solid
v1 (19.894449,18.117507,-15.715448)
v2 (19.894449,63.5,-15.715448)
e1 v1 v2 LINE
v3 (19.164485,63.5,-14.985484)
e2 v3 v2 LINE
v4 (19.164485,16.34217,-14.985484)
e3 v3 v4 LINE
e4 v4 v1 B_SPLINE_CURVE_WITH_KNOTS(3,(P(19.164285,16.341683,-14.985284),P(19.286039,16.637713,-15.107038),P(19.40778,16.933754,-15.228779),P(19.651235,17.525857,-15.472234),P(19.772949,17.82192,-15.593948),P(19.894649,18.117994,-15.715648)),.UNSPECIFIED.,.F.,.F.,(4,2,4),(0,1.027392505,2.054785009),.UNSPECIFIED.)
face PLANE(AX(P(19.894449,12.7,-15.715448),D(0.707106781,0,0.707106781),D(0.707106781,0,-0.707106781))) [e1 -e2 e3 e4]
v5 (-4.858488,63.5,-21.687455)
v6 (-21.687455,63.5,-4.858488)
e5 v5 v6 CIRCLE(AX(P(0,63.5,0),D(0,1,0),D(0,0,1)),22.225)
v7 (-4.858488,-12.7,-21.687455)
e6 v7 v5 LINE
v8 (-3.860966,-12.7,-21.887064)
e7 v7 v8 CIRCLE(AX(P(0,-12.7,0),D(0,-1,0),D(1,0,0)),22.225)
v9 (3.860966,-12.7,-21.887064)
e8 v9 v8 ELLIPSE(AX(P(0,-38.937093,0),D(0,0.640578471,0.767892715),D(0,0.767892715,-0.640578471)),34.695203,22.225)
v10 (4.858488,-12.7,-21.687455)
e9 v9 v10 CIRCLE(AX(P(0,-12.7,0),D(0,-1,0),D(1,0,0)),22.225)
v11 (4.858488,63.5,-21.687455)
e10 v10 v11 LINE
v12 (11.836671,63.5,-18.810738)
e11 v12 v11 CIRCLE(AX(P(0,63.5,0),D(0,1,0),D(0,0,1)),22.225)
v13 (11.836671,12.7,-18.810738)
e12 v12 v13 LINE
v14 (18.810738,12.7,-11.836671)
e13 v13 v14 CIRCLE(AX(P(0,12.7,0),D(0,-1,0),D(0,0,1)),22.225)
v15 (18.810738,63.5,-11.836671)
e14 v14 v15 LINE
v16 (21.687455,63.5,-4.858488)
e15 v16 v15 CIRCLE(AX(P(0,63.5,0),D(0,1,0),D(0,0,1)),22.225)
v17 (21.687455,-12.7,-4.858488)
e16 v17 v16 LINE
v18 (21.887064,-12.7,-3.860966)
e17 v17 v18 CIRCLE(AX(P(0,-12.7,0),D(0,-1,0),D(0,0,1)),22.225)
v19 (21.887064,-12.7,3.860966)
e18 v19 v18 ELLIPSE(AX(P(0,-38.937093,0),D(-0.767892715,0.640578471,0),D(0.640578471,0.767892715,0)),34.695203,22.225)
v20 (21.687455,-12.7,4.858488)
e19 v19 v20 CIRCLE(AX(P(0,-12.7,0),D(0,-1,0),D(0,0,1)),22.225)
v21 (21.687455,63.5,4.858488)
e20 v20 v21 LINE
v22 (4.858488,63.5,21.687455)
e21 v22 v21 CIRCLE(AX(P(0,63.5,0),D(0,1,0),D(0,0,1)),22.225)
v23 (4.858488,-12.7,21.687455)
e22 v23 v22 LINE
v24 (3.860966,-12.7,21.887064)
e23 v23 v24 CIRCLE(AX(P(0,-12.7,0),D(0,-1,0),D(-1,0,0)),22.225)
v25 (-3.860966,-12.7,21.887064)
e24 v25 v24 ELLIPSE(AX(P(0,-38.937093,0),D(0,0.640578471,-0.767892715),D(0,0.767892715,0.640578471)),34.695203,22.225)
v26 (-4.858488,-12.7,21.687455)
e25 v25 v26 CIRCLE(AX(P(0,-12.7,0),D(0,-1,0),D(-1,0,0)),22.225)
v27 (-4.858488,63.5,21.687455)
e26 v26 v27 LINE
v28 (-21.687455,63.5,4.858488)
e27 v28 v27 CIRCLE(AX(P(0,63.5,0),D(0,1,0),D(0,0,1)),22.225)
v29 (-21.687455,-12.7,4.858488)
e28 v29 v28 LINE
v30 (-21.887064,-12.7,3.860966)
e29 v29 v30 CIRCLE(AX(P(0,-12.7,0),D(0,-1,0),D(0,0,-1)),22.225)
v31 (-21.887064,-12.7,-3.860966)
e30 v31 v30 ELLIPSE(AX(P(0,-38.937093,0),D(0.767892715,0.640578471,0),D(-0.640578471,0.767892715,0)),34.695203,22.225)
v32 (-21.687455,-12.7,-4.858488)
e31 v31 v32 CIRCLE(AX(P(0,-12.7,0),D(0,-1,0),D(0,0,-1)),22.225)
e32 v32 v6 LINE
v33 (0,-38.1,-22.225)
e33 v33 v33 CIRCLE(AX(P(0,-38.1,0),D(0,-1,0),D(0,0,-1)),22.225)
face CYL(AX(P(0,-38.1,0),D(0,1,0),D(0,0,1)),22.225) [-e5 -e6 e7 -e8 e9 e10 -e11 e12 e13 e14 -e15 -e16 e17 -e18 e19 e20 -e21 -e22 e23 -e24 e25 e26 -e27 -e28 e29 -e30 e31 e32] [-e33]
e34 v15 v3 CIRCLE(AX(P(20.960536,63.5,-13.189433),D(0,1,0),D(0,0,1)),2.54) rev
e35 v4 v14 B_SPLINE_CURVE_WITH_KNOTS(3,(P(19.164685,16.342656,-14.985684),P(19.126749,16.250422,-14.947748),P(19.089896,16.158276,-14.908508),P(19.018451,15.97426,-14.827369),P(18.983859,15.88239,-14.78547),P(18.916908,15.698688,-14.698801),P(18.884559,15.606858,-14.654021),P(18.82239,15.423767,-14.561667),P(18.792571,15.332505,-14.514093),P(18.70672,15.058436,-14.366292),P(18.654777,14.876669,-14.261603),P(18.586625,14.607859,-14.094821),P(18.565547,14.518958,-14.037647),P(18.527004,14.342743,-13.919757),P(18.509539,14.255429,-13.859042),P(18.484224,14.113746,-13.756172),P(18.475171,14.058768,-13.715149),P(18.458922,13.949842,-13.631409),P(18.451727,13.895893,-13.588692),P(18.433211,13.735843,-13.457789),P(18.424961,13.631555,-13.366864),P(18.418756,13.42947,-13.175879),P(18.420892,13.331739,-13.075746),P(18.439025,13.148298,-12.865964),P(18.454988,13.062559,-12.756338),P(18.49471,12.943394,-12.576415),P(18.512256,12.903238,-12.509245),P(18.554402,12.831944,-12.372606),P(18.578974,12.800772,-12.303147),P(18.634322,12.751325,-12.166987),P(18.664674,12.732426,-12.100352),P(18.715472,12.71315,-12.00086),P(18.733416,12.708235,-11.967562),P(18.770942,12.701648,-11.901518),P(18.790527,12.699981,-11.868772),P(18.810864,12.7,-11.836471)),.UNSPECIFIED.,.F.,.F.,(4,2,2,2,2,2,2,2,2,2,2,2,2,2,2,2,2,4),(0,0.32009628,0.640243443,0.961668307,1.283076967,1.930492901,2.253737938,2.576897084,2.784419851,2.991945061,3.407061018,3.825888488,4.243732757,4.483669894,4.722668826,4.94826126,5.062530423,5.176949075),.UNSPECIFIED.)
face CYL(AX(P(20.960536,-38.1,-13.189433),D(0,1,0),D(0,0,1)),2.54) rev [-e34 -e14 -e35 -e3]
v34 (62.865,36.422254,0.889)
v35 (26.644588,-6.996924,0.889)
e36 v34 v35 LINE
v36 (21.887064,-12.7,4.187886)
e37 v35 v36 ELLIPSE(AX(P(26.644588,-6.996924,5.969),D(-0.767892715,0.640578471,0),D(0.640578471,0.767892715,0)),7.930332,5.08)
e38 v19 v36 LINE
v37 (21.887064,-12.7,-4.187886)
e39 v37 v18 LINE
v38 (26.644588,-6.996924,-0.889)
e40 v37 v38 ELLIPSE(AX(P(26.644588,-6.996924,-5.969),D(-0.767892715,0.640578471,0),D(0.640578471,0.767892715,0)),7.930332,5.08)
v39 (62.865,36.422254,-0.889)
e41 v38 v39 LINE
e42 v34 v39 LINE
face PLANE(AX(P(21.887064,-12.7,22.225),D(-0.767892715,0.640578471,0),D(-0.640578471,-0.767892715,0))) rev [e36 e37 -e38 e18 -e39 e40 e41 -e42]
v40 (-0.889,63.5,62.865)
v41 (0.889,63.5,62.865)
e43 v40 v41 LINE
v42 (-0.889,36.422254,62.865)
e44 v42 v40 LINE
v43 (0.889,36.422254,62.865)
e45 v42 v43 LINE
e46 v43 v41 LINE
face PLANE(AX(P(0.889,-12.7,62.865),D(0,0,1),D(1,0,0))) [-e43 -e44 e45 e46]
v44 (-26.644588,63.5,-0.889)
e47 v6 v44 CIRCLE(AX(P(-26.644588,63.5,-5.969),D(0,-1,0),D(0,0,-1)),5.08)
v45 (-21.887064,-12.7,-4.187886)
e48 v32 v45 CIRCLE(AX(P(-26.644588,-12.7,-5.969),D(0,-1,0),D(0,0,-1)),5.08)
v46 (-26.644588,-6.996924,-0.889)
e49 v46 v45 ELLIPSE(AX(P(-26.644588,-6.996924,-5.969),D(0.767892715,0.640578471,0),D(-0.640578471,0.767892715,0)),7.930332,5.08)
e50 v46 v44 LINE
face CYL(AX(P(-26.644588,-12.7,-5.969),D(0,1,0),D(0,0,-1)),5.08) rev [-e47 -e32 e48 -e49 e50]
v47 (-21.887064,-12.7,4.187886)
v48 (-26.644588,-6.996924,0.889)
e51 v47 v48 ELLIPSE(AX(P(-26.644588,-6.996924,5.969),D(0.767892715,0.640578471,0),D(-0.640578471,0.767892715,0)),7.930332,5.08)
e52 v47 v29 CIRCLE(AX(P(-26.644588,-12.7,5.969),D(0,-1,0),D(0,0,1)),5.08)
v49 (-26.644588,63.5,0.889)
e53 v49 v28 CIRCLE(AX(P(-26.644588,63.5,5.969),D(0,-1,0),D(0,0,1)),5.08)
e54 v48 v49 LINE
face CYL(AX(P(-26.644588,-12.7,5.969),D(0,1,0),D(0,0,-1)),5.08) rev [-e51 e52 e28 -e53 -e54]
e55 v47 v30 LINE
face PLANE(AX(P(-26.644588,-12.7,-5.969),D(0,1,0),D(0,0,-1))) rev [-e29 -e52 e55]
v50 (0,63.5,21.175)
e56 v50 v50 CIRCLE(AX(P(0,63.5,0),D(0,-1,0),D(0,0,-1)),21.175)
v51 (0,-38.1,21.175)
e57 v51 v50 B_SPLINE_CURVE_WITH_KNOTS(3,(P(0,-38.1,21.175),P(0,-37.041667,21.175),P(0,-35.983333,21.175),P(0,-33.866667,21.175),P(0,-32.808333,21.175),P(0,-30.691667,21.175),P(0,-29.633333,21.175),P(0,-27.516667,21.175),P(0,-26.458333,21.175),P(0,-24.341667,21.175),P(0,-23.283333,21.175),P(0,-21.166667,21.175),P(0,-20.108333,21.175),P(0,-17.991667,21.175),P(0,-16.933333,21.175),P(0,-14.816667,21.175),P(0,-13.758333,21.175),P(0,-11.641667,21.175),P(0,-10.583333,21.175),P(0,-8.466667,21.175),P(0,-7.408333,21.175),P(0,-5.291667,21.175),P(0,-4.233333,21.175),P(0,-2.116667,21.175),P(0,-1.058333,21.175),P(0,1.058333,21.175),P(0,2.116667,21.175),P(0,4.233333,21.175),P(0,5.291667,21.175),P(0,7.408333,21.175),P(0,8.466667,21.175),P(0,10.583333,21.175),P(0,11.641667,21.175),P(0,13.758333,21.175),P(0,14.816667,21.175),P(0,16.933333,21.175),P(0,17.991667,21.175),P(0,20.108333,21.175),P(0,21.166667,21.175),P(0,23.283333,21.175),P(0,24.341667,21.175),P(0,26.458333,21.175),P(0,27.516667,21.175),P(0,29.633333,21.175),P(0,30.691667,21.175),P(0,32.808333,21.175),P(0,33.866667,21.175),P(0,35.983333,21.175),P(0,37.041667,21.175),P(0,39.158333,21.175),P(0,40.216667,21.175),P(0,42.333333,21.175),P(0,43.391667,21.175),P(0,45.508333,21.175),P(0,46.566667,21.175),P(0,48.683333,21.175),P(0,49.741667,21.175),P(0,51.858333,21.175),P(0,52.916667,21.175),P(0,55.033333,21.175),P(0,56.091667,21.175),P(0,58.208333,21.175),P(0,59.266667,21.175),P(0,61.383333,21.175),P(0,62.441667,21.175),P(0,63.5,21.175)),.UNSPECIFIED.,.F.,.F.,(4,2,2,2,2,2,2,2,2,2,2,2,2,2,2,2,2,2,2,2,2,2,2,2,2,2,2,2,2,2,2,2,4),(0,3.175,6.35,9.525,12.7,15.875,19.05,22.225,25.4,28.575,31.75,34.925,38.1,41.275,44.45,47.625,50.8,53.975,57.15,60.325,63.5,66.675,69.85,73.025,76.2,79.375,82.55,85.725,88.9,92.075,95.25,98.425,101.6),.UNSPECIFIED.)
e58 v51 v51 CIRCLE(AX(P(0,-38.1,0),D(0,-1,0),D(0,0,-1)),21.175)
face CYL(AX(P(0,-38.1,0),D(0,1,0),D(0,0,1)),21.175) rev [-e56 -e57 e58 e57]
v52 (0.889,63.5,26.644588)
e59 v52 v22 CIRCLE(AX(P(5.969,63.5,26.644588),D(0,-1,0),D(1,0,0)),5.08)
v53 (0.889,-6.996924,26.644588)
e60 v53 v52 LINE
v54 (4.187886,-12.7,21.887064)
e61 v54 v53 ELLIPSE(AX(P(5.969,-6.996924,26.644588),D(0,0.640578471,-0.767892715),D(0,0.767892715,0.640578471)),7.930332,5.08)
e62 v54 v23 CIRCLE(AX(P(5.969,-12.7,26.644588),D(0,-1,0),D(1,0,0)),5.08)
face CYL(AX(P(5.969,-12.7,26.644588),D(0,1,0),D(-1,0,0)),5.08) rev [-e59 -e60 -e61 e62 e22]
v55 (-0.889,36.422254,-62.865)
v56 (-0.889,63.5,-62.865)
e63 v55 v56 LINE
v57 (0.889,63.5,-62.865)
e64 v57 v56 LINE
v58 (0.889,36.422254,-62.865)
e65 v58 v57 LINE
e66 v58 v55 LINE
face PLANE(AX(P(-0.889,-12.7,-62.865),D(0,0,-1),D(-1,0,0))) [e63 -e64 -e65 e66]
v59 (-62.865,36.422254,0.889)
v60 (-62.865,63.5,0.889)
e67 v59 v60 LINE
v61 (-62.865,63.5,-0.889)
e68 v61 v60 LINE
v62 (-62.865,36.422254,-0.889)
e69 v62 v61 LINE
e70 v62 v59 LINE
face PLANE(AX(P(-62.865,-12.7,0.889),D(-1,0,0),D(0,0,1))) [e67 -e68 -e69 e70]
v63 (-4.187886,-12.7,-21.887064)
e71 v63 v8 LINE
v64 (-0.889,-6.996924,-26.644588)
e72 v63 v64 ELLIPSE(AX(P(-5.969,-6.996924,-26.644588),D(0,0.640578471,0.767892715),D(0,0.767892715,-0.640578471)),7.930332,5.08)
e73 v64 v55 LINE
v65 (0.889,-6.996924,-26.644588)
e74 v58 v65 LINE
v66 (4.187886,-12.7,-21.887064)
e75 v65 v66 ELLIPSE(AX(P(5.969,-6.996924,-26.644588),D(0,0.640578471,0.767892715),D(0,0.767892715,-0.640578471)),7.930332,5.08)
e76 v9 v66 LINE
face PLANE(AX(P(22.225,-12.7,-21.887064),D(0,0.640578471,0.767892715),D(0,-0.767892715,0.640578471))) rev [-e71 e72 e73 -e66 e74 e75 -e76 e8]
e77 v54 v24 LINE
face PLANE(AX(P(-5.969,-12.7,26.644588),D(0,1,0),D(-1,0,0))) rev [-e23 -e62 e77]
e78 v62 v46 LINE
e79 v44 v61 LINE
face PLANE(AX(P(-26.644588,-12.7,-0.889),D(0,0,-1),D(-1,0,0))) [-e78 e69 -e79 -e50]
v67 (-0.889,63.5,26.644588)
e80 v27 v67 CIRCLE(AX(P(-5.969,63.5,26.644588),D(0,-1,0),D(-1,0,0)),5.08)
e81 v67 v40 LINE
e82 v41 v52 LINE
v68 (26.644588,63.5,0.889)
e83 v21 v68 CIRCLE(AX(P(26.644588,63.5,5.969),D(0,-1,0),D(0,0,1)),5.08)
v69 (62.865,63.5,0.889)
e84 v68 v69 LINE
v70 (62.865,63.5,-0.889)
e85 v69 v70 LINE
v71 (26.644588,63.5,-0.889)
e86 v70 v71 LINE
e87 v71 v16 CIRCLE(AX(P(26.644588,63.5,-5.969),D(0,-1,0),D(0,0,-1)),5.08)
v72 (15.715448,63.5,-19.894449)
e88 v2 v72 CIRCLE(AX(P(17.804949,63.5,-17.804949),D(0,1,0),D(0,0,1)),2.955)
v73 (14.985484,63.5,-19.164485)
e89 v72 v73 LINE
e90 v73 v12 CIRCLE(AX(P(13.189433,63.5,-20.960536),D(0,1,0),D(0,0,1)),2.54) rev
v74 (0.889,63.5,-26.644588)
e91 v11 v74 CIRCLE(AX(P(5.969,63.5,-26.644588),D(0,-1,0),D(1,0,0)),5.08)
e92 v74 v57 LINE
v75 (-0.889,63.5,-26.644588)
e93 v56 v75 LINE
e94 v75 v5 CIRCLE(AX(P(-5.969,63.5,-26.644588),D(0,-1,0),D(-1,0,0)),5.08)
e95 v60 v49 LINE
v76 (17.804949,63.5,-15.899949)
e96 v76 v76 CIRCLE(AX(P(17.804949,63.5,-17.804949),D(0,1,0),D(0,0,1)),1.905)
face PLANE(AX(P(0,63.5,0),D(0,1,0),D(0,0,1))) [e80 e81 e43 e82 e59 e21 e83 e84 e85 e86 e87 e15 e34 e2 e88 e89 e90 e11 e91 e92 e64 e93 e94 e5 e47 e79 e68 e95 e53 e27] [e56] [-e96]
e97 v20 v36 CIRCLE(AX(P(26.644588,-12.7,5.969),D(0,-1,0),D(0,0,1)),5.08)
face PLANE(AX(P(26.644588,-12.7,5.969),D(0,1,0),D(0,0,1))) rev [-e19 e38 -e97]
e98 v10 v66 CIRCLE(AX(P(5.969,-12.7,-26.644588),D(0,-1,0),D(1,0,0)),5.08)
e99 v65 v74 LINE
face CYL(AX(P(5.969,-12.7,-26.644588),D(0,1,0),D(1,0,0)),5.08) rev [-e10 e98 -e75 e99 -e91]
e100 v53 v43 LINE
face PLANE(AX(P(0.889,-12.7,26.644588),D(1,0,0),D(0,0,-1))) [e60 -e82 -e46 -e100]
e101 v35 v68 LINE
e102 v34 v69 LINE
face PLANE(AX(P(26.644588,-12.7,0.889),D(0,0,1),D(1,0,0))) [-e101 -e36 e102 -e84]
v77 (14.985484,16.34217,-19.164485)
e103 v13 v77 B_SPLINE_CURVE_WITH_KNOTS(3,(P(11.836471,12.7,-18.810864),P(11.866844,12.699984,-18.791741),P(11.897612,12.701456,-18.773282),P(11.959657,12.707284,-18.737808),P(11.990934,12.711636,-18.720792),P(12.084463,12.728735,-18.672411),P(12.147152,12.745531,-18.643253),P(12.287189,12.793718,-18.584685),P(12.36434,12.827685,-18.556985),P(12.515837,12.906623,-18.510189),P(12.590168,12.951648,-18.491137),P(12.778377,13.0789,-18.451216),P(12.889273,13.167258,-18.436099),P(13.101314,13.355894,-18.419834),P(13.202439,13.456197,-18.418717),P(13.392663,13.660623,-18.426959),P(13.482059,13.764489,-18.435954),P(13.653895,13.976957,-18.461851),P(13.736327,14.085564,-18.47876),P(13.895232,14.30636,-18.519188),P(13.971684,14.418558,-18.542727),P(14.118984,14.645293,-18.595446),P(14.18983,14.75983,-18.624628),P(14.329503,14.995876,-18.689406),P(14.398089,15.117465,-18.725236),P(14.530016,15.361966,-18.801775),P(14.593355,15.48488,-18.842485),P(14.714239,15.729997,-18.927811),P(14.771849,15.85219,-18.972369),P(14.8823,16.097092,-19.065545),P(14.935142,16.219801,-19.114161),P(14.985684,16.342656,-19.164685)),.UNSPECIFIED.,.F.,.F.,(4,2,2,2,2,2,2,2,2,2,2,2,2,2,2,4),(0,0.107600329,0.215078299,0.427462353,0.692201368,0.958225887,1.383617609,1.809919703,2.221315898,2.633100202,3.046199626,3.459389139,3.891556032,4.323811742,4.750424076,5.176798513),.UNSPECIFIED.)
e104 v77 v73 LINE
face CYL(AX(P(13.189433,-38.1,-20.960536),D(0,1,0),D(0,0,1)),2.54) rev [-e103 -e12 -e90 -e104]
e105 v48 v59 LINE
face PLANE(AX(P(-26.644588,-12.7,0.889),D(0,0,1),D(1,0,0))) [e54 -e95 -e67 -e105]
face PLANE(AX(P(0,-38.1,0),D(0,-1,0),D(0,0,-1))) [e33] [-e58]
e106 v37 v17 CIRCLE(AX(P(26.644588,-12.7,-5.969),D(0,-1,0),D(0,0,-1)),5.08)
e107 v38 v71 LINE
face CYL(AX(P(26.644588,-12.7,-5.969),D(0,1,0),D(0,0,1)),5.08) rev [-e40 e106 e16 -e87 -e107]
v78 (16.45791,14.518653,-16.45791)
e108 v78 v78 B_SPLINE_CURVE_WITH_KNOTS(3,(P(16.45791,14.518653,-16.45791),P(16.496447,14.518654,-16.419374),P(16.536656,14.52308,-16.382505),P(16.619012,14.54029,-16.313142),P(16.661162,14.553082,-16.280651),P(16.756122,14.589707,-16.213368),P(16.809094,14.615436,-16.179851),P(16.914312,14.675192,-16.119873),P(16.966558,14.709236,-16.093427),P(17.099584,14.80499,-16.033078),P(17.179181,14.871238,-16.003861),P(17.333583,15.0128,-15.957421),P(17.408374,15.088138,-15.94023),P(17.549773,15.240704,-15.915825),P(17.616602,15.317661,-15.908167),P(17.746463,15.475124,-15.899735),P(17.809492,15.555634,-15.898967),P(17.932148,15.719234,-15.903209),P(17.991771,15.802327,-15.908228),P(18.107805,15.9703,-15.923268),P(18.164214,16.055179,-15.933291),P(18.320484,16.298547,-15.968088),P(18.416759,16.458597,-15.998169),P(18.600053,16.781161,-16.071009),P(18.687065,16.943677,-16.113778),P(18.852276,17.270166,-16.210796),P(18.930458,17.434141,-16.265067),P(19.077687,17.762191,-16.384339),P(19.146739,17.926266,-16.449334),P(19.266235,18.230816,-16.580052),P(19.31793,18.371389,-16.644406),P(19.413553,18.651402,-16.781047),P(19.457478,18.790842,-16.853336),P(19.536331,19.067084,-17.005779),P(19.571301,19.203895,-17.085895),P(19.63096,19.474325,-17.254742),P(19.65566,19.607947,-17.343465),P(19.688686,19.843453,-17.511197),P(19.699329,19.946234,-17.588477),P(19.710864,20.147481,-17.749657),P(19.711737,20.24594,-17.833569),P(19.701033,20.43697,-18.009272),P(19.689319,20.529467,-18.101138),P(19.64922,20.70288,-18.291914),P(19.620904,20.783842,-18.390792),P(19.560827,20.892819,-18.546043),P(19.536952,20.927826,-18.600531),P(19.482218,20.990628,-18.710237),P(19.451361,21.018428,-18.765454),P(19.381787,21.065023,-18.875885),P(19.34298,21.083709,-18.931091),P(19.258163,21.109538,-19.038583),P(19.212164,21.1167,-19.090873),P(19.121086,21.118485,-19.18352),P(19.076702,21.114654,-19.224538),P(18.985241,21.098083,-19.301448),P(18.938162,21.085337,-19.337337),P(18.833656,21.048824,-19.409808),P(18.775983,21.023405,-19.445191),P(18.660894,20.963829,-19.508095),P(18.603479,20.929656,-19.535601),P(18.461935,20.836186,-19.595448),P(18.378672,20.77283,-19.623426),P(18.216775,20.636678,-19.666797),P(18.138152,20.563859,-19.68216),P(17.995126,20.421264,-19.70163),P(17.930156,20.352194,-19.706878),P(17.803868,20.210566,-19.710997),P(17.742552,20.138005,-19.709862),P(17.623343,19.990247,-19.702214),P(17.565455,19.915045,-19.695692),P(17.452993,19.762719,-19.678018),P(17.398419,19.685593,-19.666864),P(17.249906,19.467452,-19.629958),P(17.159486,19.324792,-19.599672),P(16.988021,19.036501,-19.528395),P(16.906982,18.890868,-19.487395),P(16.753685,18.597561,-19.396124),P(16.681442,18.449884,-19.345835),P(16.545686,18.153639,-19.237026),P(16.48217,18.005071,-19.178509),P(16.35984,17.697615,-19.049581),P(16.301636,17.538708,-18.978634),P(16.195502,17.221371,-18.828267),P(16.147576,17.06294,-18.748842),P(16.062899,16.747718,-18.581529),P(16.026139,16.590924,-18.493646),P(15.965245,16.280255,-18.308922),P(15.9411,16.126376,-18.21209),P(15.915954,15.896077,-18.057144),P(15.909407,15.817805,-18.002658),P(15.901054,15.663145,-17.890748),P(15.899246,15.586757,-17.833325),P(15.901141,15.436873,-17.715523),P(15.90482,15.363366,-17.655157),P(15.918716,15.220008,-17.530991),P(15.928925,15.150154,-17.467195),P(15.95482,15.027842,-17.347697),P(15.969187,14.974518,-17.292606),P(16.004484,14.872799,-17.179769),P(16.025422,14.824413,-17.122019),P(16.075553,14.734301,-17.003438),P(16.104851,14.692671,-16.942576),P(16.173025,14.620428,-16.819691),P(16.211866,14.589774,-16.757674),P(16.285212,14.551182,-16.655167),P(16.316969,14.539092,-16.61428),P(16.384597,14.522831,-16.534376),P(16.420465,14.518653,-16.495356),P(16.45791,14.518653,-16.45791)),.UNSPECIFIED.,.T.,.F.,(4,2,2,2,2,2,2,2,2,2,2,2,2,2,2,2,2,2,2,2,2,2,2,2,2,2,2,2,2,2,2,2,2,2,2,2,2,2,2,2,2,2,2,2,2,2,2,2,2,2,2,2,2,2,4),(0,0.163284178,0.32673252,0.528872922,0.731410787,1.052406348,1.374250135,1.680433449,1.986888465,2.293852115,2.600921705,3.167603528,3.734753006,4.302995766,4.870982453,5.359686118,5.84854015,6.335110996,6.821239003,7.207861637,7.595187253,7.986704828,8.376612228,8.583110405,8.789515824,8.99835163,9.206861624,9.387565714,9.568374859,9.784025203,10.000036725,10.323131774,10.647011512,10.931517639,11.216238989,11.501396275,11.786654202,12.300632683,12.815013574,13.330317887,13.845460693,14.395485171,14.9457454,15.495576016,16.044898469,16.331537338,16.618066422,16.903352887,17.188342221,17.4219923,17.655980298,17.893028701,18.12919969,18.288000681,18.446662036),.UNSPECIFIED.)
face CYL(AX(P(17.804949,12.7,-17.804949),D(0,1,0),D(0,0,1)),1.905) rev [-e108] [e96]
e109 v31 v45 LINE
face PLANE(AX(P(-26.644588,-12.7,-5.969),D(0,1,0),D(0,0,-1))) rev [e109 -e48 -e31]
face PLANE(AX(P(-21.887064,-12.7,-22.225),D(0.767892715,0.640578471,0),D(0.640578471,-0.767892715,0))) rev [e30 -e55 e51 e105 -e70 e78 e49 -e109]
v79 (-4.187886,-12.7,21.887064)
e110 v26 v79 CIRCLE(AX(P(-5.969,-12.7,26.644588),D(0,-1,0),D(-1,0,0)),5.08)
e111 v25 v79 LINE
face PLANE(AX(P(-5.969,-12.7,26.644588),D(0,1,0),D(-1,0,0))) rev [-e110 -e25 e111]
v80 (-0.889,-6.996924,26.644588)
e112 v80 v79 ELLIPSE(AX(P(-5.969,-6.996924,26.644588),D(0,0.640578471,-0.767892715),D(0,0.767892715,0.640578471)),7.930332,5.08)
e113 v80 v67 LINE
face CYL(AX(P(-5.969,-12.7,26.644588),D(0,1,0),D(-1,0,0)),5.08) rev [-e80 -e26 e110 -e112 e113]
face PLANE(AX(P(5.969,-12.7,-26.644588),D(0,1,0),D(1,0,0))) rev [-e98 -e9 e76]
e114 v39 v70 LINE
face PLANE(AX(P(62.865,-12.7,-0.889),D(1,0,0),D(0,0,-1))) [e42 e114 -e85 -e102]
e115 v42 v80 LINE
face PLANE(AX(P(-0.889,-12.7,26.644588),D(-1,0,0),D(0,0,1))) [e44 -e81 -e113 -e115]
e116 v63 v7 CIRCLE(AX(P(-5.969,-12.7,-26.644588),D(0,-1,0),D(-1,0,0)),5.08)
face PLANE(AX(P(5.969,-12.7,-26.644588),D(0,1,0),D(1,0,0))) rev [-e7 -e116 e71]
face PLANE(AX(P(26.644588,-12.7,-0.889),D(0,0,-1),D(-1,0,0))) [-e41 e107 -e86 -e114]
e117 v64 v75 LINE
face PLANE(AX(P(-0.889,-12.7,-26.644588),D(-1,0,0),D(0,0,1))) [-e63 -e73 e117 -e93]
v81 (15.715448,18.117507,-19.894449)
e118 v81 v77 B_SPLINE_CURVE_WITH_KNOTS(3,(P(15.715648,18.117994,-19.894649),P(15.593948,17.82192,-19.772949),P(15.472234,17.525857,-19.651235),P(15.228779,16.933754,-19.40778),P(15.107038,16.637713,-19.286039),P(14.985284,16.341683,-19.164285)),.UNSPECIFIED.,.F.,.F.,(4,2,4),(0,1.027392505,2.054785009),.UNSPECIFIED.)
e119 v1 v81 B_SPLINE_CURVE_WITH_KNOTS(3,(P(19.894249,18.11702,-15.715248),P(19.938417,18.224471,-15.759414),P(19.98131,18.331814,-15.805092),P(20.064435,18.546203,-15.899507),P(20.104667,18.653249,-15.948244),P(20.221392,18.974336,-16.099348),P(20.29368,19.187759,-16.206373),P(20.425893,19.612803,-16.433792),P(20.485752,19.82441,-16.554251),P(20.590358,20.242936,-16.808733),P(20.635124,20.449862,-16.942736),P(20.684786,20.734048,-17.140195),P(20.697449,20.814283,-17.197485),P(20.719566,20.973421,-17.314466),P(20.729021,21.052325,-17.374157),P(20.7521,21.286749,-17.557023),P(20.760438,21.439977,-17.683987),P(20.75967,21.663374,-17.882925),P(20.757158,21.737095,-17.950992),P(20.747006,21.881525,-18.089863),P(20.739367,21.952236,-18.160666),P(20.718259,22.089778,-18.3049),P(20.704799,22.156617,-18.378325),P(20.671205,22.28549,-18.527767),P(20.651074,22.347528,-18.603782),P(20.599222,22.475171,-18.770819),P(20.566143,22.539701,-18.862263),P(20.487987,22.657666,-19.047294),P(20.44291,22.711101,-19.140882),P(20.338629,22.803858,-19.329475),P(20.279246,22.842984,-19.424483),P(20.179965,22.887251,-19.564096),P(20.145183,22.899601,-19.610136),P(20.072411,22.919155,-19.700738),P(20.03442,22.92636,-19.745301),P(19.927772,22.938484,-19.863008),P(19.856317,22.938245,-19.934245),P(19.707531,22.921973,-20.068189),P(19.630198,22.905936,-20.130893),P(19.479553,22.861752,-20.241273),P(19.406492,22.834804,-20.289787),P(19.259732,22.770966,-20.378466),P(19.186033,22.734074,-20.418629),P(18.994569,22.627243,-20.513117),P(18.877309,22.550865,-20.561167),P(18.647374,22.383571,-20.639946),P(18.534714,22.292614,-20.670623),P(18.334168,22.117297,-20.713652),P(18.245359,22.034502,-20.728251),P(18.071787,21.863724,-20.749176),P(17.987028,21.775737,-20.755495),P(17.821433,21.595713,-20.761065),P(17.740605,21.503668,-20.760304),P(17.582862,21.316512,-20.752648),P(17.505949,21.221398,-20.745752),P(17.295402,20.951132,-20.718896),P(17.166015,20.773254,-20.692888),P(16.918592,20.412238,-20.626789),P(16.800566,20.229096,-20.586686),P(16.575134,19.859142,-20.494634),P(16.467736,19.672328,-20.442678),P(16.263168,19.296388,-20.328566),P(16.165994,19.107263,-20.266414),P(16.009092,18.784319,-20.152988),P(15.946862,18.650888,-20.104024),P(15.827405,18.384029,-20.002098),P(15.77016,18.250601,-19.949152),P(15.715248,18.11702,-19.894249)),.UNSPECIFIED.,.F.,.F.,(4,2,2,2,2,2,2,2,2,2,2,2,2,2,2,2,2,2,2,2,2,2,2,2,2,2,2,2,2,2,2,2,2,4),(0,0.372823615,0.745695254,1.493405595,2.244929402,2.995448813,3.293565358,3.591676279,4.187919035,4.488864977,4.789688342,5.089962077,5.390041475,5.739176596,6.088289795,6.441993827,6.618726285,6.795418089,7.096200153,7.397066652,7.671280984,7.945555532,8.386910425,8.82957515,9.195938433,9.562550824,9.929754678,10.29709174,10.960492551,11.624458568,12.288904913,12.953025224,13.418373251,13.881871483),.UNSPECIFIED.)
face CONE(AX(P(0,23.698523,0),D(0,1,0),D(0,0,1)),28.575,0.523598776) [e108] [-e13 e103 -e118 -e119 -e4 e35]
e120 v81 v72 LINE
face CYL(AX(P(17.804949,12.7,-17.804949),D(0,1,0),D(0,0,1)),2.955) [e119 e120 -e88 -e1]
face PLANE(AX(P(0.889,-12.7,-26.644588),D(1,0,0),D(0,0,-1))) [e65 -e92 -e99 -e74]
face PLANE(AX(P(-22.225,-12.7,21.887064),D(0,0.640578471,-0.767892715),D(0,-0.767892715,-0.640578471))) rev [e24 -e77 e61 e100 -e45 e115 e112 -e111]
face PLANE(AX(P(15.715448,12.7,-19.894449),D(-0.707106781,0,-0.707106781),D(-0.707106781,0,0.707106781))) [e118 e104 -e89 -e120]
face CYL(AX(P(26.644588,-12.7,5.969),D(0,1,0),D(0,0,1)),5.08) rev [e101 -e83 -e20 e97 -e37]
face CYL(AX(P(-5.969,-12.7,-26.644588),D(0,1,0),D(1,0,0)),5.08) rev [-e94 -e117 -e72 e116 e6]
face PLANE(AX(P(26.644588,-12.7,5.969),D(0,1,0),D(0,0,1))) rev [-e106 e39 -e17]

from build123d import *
from build123d.topology import SkipClean

# Parameters (mm, degrees)
SKETCH1_R             = 22.225
SKETCH1_R_2           = 9.05
BOSS_EXTRUDE1_DEPTH   = 63.5
SKETCH2_R             = 11.9
BOSS_EXTRUDE2_DEPTH   = 69.85
BOSS_EXTRUDE3_START   = -2.032
SKETCH5_R             = 22.225
SKETCH5_R_2           = 9.05
BOSS_EXTRUDE3_DEPTH   = 2.032
SKETCH6_R             = 1.5875
BOSS_EXTRUDE4_DEPTH   = 19.05
SKETCH6_2_R           = 1.5875
CUT_EXTRUDE8_DEPTH    = 19.05
BOSS_EXTRUDE5_START   = -76.2
BOSS_EXTRUDE5_DEPTH   = 76.2
CUT_EXTRUDE9_DEPTH    = 97.774416666
BOSS_EXTRUDE6_DEPTH   = 15.875
BOSS_EXTRUDE6_2_DEPTH = 15.875
BOSS_EXTRUDE7_START   = 38.1
SKETCH11_R            = 22.225
SKETCH11_R_2          = 21.175
BOSS_EXTRUDE7_DEPTH   = 38.1
CIRPATTERN2_COUNT     = 4
CIRPATTERN2_2_COUNT   = 4
SKETCH24_R            = 1.905
BOSS_EXTRUDE13_DEPTH  = 50.8
FILLET1_R             = 2.54
CUT_REVOLVE1_ANGLE    = 25.63963
CUT_EXTRUDE10_START   = -3.686202
SKETCH28_R            = 3.175
CUT_EXTRUDE10_DEPTH   = 20.1828
SKETCH30_R            = 21.175
CUT_EXTRUDE11_DEPTH   = 136.005838653


# Read off the part's stored shape, not the designer's step: Cut-Revolve1
with BuildPart() as part:
    # Sketch1 → Boss-Extrude1 (new body)
    with BuildSketch(Plane(origin=(0, 0, 0), x_dir=(1, 0, 0), z_dir=(0, 1, 0))):
        with Locations(Location((0, 0, 0), (0, 0, 270))):
            Circle(SKETCH1_R)
        with Locations(Location((0, 0, 0), (0, 0, 270))):
            Circle(SKETCH1_R_2, mode=Mode.SUBTRACT)
        with BuildLine():
            Line((0.5207, 10.077957406), (0.5207, 21.168596942))
            ThreePointArc((0.5207, 21.168596942), (14.972986092, 14.972986092), (21.168596942, 0.5207))
            Line((21.168596942, 0.5207), (10.077957406, 0.5207))
            ThreePointArc((10.077957406, 0.5207), (7.135697372, 7.135697372), (0.5207, 10.077957406))
        make_face(mode=Mode.SUBTRACT)
        with BuildLine():
            Line((-0.5207, 10.077957406), (-0.5207, 21.168596942))
            ThreePointArc((-0.5207, 21.168596942), (-14.972986092, 14.972986092), (-21.168596942, 0.5207))
            Line((-21.168596942, 0.5207), (-10.077957406, 0.5207))
            ThreePointArc((-10.077957406, 0.5207), (-7.135697372, 7.135697372), (-0.5207, 10.077957406))
        make_face(mode=Mode.SUBTRACT)
        with BuildLine():
            Line((10.077957406, -0.5207), (21.168596942, -0.5207))
            ThreePointArc((21.168596942, -0.5207), (14.972986092, -14.972986092), (0.5207, -21.168596942))
            Line((0.5207, -21.168596942), (0.5207, -10.077957406))
            ThreePointArc((0.5207, -10.077957406), (7.135697372, -7.135697372), (10.077957406, -0.5207))
        make_face(mode=Mode.SUBTRACT)
        with BuildLine():
            Line((-0.5207, -10.077957406), (-0.5207, -21.168596942))
            ThreePointArc((-0.5207, -21.168596942), (-14.972986092, -14.972986092), (-21.168596942, -0.5207))
            Line((-21.168596942, -0.5207), (-10.077957406, -0.5207))
            ThreePointArc((-10.077957406, -0.5207), (-7.135697372, -7.135697372), (-0.5207, -10.077957406))
        make_face(mode=Mode.SUBTRACT)
    extrude(amount=BOSS_EXTRUDE1_DEPTH)

    # Sketch5 → Boss-Extrude3 (add)
    with BuildSketch(Plane(origin=(0, 63.5, 0), x_dir=(1, 0, 0), z_dir=(0, 1, 0)).offset(BOSS_EXTRUDE3_START)):
        with Locations(Location((0, 0, 0), (0, 0, 270))):
            Circle(SKETCH5_R)
        with Locations(Location((0, 0, 0), (0, 0, 270))):
            Circle(SKETCH5_R_2, mode=Mode.SUBTRACT)
    extrude(amount=BOSS_EXTRUDE3_DEPTH)

    # Sketch6 → Boss-Extrude4 (add)
    # profile 1 of 2: a face of its own
    with BuildSketch(Plane(origin=(0, 63.5, 0), x_dir=(1, 0, 0), z_dir=(0, 1, 0))):
        with BuildLine():
            Line((9.784809653, 2.468573274), (9.784809653, -2.468573274))
            ThreePointArc((9.784809653, -2.468573274), (14.7904, 0), (9.784809653, 2.468573274))
        make_face()
        with Locations((11.6789, 0)):
            Circle(SKETCH6_R, mode=Mode.SUBTRACT)
    # profile 2 of 2: a face of its own
    with BuildSketch(Plane(origin=(0, 63.5, 0), x_dir=(1, 0, 0), z_dir=(0, 1, 0))):
        with BuildLine():
            Line((-9.784809653, 2.468573274), (-9.784809653, -2.468573274))
            ThreePointArc((-9.784809653, -2.468573274), (-14.7904, 0), (-9.784809653, 2.468573274))
        make_face()
        with Locations((-11.6789, 0)):
            Circle(SKETCH6_R, mode=Mode.SUBTRACT)
    extrude(amount=-BOSS_EXTRUDE4_DEPTH)

    # Sketch6<2> → Cut-Extrude8 (cut)
    with BuildSketch(Plane(origin=(0, 63.5, 0), x_dir=(1, 0, 0), z_dir=(0, 1, 0))):
        with Locations(Location((-11.6789, 0, 0), (0, 0, 270))):
            Circle(SKETCH6_2_R)
        with Locations(Location((11.6789, 0, 0), (0, 0, 270))):
            Circle(SKETCH6_2_R)
    extrude(amount=-CUT_EXTRUDE8_DEPTH, mode=Mode.SUBTRACT)

    # Sketch8 → Boss-Extrude5 (add)
    with BuildSketch(Plane(origin=(0, 63.5, 0), x_dir=(1, 0, 0), z_dir=(0, 1, 0)).offset(BOSS_EXTRUDE5_START)):
        with BuildLine():
            Line((26.644587893, -0.889), (62.865, -0.889))
            Line((62.865, -0.889), (62.865, 0.889))
            Line((62.865, 0.889), (26.644587893, 0.889))
            ThreePointArc((26.644587893, 0.889), (23.469292558, 2.003662746), (21.687455262, 4.858488372))
            ThreePointArc((21.687455262, 4.858488372), (22.225, 0), (21.687455262, -4.858488372))
            ThreePointArc((21.687455262, -4.858488372), (23.469292558, -2.003662746), (26.644587893, -0.889))
        make_face()
    boss_extrude5 = extrude(amount=BOSS_EXTRUDE5_DEPTH)

    # Sketch9 → Cut-Extrude9 (cut, symmetric)
    with BuildSketch(Plane(origin=(0, 0, -0.889), x_dir=(-1, 0, 0), z_dir=(0, 0, -1))):
        Polygon((-21.887063983, -12.7), (-62.865, 36.422254278), (-62.865, -12.7), align=None)
    cut_extrude9 = extrude(amount=CUT_EXTRUDE9_DEPTH, both=True, mode=Mode.SUBTRACT)

    # CirPattern2: Boss-Extrude5 ×4 about axis
    cirpattern2_axis = Axis((0, 0, 0), (0, 1, 0))
    for i in range(1, CIRPATTERN2_COUNT):
        add(boss_extrude5.rotate(cirpattern2_axis, i * 360 / CIRPATTERN2_COUNT))

    # CirPattern2 2: Cut-Extrude9 ×4 about axis
    cirpattern2_2_axis = Axis((0, 0, 0), (0, 1, 0))
    for i in range(1, CIRPATTERN2_2_COUNT):
        add(cut_extrude9.rotate(cirpattern2_2_axis, i * 360 / CIRPATTERN2_2_COUNT), mode=Mode.SUBTRACT)


with BuildPart() as body_2:
    # Sketch2 → Boss-Extrude2 (new body)
    with BuildSketch(Plane.XZ):
        with Locations(Location((0, 0, 0), (0, 0, 270))):
            Circle(SKETCH2_R)
    extrude(amount=-BOSS_EXTRUDE2_DEPTH)


with BuildPart() as body_3:
    # Sketch10 → Boss-Extrude6 (new body)
    with BuildSketch(Plane.XZ):
        with BuildLine():
            Line((6.405198203, 7.798063217), (6.405198203, -7.798063217))
            ThreePointArc((6.405198203, -7.798063217), (10.0914, 0), (6.405198203, 7.798063217))
        make_face()
    extrude(amount=BOSS_EXTRUDE6_DEPTH)


with BuildPart() as body_4:
    # Sketch10 → Boss-Extrude6 2 (new body)
    with BuildSketch(Plane.XZ):
        with BuildLine():
            Line((-6.405198203, 7.798063217), (-6.405198203, -7.798063217))
            ThreePointArc((-6.405198203, -7.798063217), (-10.0914, 0), (-6.405198203, 7.798063217))
        make_face()
    extrude(amount=BOSS_EXTRUDE6_2_DEPTH)

    # Combine3: union body 3, part
    add(body_3.part)
    add(part.part)


with BuildPart() as body_5:
    # Sketch11 → Boss-Extrude7 (new body)
    with BuildSketch(Plane.XZ.offset(BOSS_EXTRUDE7_START)):
        with Locations(Location((0, 0, 0), (0, 0, 90))):
            Circle(SKETCH11_R)
        with Locations(Location((0, 0, 0), (0, 0, 90))):
            Circle(SKETCH11_R_2, mode=Mode.SUBTRACT)
    extrude(amount=-BOSS_EXTRUDE7_DEPTH)

    # Combine4: union body 4
    add(body_4.part)

    # Sketch24 → Boss-Extrude13 (add)
    with SkipClean():  # the faces are left unmerged after this step: merging them gives an invalid solid
        with BuildSketch(Plane(origin=(0, 63.5, 0), x_dir=(1, 0, 0), z_dir=(0, 1, 0))):
            with BuildLine():
                Line((15.715448212, 19.894449289), (13.48641998, 17.665421057))
                ThreePointArc((13.48641998, 17.665421057), (15.715448212, 15.715448212), (17.665421057, 13.48641998))
                Line((17.665421057, 13.48641998), (19.894449289, 15.715448212))
                ThreePointArc((19.894449289, 15.715448212), (19.894449289, 19.894449289), (15.715448212, 19.894449289))
            make_face()
            with Locations(Location((17.80494875, 17.80494875, 0), (0, 0, 270))):
                Circle(SKETCH24_R, mode=Mode.SUBTRACT)
        extrude(amount=-BOSS_EXTRUDE13_DEPTH)

    # Fillet1
    # the kernel refuses this fillet: 2.54 mm, written as the material it adds along each edge
    with BuildSketch(Plane(origin=(17.665421057, 63.5, -13.48641998), x_dir=(0.5702807097884103, 0, 0.8214498840728065), z_dir=(0, -1, 0))) as fillet1_piece_1:
        with BuildLine():
            CenterArc((2.123100743, -2.537406084), FILLET1_R, 92.589617746, 77.180185074)
            Line((-0.376518694, -2.086293381), (0, 0))
            ThreePointArc((0, 0), (1.00416927, -0.022696762), (2.00833854, 0))
        make_face()
    extrude(amount=50.8)
    with BuildSketch(Plane(origin=(13.48641998, 63.5, -17.665421057), x_dir=(-0.8214498840728011, 0, -0.5702807097884178), z_dir=(0, -1, 0))) as fillet1_piece_2:
        with BuildLine():
            CenterArc((2.123100743, 2.537406084), FILLET1_R, 190.23019718, 77.180185074)
            Line((-0.376518694, 2.086293381), (0, 0))
            ThreePointArc((0, 0), (1.00416927, 0.022696762), (2.00833854, 0))
        make_face()
    extrude(amount=50.8)

    # Cut-Revolve1 outline → Cut-Revolve1 (revolve, cut)
    with BuildSketch(Plane(origin=(0, 0, 0), x_dir=(0.8463774031608068, 0, -0.5325836004035134), z_dir=(0.5325836004035134, 0, 0.8463774031608068))):
        Polygon((28.135, 22.936420272), (22.224995946, 12.699992978), (28.135, 12.7), align=None)
    revolve(axis=Axis((0, 0, 0), (0, 1, 0)), revolution_arc=CUT_REVOLVE1_ANGLE, mode=Mode.SUBTRACT)

    # Sketch28 → Cut-Extrude10 (cut)
    with BuildSketch(Plane(origin=(-6.405198203, 0, 0), x_dir=(0, 0, -1), z_dir=(1, 0, 0)).offset(CUT_EXTRUDE10_START)):
        with BuildLine():
            ThreePointArc((0, -15.875), (-4.312339676, -14.90751986), (-7.798063217, -12.19053206))
            Line((-7.798063217, -12.19053206), (-7.798063217, -15.875))
            Line((-7.798063217, -15.875), (0, -15.875))
        make_face()
        with BuildLine():
            ThreePointArc((7.798063217, -12.19053206), (4.312339676, -14.90751986), (0, -15.875))
            Line((0, -15.875), (7.798063217, -15.875))
            Line((7.798063217, -15.875), (7.798063217, -12.19053206))
        make_face()
        with Locations((0, -5.780585399)):
            Circle(SKETCH28_R)
    extrude(amount=CUT_EXTRUDE10_DEPTH, mode=Mode.SUBTRACT)

    # Sketch30 → Cut-Extrude11 (cut, through all)
    with BuildSketch(Plane.XZ.offset(38.1)):
        with Locations(Location((0, 0, 0), (0, 0, 90))):
            Circle(SKETCH30_R)
    extrude(amount=-CUT_EXTRUDE11_DEPTH, mode=Mode.SUBTRACT)


solid = body_5.part
